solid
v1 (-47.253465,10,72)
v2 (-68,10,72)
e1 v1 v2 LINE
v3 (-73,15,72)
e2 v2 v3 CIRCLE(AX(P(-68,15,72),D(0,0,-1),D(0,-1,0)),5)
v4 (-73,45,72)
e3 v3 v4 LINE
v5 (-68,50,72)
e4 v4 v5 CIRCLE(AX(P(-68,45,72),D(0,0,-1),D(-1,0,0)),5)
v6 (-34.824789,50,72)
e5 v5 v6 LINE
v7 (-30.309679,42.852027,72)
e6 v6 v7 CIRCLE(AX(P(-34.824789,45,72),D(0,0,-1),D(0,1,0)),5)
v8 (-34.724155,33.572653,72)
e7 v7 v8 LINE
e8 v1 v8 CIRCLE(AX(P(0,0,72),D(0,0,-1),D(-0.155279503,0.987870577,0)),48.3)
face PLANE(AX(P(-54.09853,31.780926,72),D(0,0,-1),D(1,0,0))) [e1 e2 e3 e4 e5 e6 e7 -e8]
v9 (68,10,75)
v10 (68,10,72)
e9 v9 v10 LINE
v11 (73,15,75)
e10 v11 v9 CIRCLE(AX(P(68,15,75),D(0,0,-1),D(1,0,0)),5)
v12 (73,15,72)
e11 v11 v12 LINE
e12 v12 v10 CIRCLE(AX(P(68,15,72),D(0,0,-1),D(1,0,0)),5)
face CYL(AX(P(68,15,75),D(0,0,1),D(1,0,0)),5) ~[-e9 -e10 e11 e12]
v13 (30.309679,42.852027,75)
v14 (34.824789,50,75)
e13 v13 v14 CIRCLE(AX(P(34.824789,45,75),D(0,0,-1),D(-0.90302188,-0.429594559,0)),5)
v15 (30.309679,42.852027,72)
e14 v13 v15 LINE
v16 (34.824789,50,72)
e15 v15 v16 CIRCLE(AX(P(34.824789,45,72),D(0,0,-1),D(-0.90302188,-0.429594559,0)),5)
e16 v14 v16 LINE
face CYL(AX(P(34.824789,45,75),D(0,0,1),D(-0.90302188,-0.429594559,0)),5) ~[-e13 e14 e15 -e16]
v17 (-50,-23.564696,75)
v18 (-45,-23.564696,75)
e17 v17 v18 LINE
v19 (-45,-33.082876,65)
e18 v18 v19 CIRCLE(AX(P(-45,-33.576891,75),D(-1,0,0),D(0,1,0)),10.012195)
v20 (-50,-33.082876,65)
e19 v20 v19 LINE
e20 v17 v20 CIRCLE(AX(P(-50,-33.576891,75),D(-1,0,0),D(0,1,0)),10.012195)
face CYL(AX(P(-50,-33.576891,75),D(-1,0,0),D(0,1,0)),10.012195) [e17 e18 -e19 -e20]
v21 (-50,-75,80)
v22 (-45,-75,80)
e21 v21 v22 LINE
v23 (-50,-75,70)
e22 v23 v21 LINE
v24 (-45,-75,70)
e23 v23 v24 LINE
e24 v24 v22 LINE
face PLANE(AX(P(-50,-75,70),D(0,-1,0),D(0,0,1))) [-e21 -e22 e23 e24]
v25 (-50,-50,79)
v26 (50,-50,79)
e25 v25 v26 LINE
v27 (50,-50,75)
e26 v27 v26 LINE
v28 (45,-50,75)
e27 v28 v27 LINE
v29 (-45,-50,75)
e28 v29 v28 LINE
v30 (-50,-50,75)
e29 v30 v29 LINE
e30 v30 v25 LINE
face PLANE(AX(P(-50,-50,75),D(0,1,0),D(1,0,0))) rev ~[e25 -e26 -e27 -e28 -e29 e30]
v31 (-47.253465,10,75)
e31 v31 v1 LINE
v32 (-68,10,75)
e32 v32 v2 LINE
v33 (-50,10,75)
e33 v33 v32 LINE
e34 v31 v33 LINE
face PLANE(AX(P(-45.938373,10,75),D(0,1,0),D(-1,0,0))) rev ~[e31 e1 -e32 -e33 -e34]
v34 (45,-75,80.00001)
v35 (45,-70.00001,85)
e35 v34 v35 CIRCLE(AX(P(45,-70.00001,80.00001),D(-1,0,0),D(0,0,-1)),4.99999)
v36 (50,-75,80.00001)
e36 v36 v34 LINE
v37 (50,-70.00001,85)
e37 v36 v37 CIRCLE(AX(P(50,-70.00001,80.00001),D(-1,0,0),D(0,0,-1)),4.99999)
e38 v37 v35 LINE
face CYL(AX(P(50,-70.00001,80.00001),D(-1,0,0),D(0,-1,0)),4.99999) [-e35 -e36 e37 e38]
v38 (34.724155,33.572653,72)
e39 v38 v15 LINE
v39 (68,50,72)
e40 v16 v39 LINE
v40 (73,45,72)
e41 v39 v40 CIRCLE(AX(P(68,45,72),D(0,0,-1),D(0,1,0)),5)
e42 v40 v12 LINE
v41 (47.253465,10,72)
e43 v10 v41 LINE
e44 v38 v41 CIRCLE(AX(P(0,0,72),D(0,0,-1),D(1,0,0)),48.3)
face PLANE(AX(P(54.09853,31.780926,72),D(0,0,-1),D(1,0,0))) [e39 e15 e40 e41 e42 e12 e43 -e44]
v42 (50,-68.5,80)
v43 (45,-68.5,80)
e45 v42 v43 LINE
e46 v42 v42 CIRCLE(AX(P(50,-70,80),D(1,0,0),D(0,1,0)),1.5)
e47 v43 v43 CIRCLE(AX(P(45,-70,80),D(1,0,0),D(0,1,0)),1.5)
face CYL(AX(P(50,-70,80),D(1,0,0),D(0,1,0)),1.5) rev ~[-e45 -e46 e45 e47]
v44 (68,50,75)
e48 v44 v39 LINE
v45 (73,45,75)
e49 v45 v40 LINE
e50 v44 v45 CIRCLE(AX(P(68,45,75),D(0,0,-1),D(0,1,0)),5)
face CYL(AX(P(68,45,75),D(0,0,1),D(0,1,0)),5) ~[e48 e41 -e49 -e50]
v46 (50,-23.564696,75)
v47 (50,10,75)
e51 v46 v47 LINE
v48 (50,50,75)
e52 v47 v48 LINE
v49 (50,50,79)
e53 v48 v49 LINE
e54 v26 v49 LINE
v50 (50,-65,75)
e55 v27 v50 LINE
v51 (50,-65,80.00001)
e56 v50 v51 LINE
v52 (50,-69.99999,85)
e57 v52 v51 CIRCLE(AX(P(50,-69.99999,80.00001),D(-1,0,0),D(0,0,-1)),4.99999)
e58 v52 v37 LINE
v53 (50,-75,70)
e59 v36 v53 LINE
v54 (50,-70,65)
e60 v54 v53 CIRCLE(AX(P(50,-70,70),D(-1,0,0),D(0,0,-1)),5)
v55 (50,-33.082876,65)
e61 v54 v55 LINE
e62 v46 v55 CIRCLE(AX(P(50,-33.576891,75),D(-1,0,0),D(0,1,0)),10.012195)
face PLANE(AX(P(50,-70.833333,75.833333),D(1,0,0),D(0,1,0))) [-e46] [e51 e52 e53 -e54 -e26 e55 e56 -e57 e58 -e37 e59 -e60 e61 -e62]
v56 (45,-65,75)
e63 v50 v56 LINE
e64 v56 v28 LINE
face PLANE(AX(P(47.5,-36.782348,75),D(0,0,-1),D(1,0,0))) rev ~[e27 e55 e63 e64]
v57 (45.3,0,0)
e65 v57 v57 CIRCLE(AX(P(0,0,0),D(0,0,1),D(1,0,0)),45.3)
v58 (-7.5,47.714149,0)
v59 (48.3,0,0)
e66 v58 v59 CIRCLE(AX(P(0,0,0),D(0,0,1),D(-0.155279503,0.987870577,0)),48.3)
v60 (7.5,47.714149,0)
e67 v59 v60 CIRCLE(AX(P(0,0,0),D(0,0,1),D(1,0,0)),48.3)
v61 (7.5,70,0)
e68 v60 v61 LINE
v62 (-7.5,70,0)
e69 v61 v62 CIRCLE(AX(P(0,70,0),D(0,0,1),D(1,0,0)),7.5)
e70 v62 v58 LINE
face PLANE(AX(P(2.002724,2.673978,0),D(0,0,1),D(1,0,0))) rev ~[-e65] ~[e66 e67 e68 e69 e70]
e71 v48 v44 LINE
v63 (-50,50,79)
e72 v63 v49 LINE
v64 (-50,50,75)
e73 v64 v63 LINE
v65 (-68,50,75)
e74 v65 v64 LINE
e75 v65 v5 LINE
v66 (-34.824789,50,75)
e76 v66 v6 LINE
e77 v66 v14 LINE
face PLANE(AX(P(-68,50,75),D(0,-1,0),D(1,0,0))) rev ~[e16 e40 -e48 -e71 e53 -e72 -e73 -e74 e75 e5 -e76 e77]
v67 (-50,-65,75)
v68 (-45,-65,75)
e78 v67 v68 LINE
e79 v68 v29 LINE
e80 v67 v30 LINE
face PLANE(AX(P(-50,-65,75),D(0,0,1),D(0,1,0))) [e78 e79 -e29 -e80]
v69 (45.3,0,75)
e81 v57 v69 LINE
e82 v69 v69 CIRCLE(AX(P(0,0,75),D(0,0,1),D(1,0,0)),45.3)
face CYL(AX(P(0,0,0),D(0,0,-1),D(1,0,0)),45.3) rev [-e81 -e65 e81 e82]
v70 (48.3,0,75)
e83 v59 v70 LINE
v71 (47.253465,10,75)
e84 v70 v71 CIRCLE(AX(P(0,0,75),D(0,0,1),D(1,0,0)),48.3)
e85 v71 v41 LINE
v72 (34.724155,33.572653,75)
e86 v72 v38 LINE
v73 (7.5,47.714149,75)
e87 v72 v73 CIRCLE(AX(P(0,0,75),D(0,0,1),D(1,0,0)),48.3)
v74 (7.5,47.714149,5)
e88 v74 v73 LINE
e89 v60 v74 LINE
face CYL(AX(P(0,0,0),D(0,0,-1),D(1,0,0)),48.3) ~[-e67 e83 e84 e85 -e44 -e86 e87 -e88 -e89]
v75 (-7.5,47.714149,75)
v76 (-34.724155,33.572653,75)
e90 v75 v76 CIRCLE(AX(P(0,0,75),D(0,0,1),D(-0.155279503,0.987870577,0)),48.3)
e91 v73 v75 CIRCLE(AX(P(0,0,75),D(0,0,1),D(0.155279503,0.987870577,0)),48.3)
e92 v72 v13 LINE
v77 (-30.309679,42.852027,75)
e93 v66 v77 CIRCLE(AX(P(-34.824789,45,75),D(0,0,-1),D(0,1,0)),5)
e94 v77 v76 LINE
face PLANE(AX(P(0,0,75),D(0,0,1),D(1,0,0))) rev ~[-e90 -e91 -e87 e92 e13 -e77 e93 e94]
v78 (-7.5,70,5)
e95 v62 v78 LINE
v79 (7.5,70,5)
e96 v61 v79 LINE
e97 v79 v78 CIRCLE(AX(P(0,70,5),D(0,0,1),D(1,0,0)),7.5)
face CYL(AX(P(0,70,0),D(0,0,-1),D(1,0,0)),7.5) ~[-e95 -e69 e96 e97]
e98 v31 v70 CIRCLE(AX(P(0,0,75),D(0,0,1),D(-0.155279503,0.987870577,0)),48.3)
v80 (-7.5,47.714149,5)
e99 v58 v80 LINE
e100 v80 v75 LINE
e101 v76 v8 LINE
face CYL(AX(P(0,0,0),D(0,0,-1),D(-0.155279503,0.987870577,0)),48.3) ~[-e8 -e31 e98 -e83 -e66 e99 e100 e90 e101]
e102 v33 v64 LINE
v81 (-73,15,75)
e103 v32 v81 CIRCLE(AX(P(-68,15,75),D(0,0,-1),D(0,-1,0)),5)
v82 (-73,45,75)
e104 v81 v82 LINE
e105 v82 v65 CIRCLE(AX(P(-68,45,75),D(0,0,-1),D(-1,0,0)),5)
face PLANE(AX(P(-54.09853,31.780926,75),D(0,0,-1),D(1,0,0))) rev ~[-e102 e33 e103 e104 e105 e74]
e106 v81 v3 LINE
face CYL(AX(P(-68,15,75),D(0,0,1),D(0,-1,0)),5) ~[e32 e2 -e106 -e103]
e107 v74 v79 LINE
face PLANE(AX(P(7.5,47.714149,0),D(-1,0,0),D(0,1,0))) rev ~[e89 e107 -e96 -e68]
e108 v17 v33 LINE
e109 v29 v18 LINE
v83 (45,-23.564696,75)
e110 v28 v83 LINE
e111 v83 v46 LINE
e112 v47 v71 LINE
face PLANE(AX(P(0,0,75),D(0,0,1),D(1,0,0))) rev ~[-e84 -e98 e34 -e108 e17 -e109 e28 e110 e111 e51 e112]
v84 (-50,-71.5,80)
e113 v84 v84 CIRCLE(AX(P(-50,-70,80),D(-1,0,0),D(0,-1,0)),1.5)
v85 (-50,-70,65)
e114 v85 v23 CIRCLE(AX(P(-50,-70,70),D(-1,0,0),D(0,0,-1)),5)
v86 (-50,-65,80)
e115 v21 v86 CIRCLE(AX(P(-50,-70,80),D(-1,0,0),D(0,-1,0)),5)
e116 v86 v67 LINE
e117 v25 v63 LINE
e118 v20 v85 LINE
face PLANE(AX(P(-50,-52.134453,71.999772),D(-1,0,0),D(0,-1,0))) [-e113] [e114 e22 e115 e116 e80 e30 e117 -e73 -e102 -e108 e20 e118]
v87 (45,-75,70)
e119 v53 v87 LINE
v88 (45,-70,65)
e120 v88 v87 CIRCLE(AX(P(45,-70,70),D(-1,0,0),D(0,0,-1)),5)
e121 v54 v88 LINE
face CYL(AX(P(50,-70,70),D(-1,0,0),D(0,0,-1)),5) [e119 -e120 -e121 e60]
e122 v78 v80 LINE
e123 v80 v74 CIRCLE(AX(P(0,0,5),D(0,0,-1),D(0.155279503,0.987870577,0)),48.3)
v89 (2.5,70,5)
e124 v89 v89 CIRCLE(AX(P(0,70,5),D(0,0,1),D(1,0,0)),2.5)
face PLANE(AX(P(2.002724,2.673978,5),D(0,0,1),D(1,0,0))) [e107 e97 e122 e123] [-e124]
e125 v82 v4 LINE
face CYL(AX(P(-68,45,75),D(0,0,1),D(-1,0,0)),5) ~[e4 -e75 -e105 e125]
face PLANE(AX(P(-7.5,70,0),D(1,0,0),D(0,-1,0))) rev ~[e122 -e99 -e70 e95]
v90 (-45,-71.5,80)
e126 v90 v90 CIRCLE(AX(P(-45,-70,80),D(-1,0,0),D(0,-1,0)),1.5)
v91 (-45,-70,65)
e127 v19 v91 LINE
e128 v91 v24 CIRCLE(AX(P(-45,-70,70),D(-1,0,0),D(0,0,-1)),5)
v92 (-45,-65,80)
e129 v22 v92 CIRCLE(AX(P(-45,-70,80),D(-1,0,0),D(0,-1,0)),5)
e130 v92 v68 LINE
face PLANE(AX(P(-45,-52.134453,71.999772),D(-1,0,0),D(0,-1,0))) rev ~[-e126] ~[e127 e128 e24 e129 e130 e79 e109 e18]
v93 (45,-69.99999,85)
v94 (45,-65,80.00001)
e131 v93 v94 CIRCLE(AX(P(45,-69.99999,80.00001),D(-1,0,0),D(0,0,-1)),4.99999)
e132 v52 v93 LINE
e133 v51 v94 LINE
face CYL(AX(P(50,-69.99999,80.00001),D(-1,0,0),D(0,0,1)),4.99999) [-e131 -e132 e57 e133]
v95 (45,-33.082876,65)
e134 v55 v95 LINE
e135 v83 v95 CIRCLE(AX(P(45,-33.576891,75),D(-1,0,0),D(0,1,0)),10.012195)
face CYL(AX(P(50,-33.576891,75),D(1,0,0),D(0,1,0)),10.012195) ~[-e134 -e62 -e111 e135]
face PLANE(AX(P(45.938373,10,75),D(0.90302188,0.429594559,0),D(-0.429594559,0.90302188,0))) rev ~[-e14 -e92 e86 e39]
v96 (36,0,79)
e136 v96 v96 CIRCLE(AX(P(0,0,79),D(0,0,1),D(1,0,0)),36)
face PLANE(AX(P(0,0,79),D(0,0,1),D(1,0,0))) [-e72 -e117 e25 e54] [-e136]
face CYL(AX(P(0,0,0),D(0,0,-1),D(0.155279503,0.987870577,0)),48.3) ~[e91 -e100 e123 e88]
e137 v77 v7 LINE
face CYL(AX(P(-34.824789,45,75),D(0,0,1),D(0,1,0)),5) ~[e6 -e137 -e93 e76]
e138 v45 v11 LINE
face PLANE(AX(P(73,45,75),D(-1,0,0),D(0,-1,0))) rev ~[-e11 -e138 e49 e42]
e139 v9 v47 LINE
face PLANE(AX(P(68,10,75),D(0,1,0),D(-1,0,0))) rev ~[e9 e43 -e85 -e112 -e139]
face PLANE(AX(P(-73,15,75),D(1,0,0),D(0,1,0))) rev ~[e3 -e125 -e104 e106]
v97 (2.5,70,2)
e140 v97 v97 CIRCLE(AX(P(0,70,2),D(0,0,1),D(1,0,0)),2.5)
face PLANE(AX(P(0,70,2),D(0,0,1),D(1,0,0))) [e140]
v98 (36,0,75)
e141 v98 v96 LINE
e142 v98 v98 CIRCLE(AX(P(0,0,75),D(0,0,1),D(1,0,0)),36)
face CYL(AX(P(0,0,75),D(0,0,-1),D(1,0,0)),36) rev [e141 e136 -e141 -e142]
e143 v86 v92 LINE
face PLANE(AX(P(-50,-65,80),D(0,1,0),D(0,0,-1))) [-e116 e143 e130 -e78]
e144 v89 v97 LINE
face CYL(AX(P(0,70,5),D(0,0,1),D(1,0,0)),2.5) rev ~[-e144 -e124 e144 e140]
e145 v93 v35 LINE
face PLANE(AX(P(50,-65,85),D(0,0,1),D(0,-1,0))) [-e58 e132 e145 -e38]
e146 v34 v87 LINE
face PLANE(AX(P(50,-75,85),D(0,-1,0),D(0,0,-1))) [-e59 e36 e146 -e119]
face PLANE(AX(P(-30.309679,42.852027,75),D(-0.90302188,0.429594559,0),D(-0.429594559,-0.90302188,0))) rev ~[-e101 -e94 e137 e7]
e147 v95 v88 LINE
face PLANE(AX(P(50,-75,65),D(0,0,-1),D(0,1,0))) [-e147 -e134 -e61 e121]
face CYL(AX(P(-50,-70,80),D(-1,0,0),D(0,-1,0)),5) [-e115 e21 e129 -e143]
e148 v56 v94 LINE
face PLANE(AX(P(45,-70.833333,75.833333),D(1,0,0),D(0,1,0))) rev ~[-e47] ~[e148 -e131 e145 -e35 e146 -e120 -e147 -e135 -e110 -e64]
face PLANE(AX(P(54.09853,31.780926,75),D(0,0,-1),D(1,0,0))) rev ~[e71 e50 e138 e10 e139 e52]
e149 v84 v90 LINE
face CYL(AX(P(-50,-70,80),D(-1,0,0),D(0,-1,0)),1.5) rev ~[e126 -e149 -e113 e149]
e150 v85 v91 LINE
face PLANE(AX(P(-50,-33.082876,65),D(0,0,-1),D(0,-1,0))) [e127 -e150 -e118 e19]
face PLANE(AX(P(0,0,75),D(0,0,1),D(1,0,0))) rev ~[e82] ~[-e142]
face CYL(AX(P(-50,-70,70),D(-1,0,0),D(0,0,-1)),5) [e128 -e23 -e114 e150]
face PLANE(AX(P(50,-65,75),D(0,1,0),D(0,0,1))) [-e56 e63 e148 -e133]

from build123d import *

# Parameters (mm, degrees)
F0_R      = 45.3
F1_DEPTH  = 75
F2_DEPTH  = 5
F3_R      = 2.5
F4_DEPTH  = 3
F5_W      = 100
F5_H      = 100
F5_R      = 48.3
F5_R_2    = 45.3
F5_R_3    = 36
F6_DEPTH  = 4
F8_DEPTH  = 3
F9_W      = 5
F9_H      = 26.435303688
F9_H_2    = 20
F10_DEPTH = 10
F12_DEPTH = 5
F14_DEPTH = 5
F15_R     = 5
F16_R     = 4.99999
F17_R     = 1.5
F18_DEPTH = 5
F20_R     = 1.5
F21_DEPTH = 5


# Not quite as in the source:
# - a fillet or chamfer is up to 0.001 mm smaller than in the source, because OpenCascade refuses the exact size


with BuildPart() as f1:
    # F0 (on Top) → F1 (new body)
    with BuildSketch(Plane.XY):
        with BuildLine():
            ThreePointArc((-7.5, 47.714148845), (-31.3898072629, -36.7092631362), (48.3, 0))
            ThreePointArc((48.3, 0), (36.7092631362, 31.3898072629), (7.5, 47.714148845))
            Line((7.5, 47.714148845), (7.5, 46.6673743725))
            Line((7.5, 46.6673743725), (-7.5, 46.6673743725))
            Line((-7.5, 46.6673743725), (-7.5, 47.714148845))
        make_face()
        Circle(F0_R, mode=Mode.SUBTRACT)
        with BuildLine():
            Line((7.5, 46.6673743725), (7.5, 47.714148845))
            ThreePointArc((7.5, 47.714148845), (0, 48.3), (-7.5, 47.714148845))
            Line((-7.5, 47.714148845), (-7.5, 46.6673743725))
            Line((-7.5, 46.6673743725), (7.5, 46.6673743725))
        make_face()
    extrude(amount=F1_DEPTH)

    # F0 (on Top) → F2 (join)
    with BuildSketch(Plane.XY):
        with BuildLine():
            ThreePointArc((-7.5, 47.714148845), (-31.3898072629, -36.7092631362), (48.3, 0))
            ThreePointArc((48.3, 0), (36.7092631362, 31.3898072629), (7.5, 47.714148845))
            Line((7.5, 47.714148845), (7.5, 46.6673743725))
            Line((7.5, 46.6673743725), (-7.5, 46.6673743725))
            Line((-7.5, 46.6673743725), (-7.5, 47.714148845))
        make_face()
        Circle(F0_R, mode=Mode.SUBTRACT)
        with BuildLine():
            Line((7.5, 46.6673743725), (7.5, 47.714148845))
            ThreePointArc((7.5, 47.714148845), (0, 48.3), (-7.5, 47.714148845))
            Line((-7.5, 47.714148845), (-7.5, 46.6673743725))
            Line((-7.5, 46.6673743725), (7.5, 46.6673743725))
        make_face()
        with BuildLine():
            ThreePointArc((-7.5, 47.714148845), (0, 48.3), (7.5, 47.714148845))
            Line((7.5, 47.714148845), (7.5, 70))
            ThreePointArc((7.5, 70), (0, 77.5), (-7.5, 70))
            Line((-7.5, 70), (-7.5, 47.714148845))
        make_face()
    extrude(amount=F2_DEPTH)

    # F3 (on face) → F4 (cut)
    with BuildSketch(Plane.XY.offset(5)):
        with Locations((0, 70)):
            Circle(F3_R)
    extrude(amount=-F4_DEPTH, mode=Mode.SUBTRACT)

    # F5 (on face) → F6 (join)
    with BuildSketch(Plane.XY.offset(75)):
        Rectangle(F5_W, F5_H)
        Circle(F5_R, mode=Mode.SUBTRACT)
        Circle(F5_R)
        Circle(F5_R_2, mode=Mode.SUBTRACT)
        Circle(F5_R_2)
        Circle(F5_R_3, mode=Mode.SUBTRACT)
    extrude(amount=F6_DEPTH)

    # F7 (on face) → F8 (join)
    with BuildSketch(Plane(origin=(0, 0, 75), x_dir=(1, 0, 0), z_dir=(0, 0, -1))):
        with BuildLine():
            Line((-68, -50), (-45.938372612, -50))
            Line((-45.938372612, -50), (-34.8247885738, -50))
            ThreePointArc((-34.8247885738, -50), (-30.5975043414, -47.6702187211), (-30.3096791752, -42.8520272073))
            Line((-30.3096791752, -42.8520272073), (-45.938372612, -10))
            Line((-45.938372612, -10), (-68, -10))
            ThreePointArc((-68, -10), (-71.5355339059, -11.4644660941), (-73, -15))
            Line((-73, -15), (-73, -45))
            ThreePointArc((-73, -45), (-71.5355339059, -48.5355339059), (-68, -50))
        make_face()
        with BuildLine():
            Line((68, -10), (45.938372612, -10))
            Line((45.938372612, -10), (30.3096791752, -42.8520272073))
            ThreePointArc((30.3096791752, -42.8520272073), (30.5975043414, -47.6702187211), (34.8247885738, -50))
            Line((34.8247885738, -50), (45.938372612, -50))
            Line((45.938372612, -50), (68, -50))
            ThreePointArc((68, -50), (71.5355339059, -48.5355339059), (73, -45))
            Line((73, -45), (73, -15))
            ThreePointArc((73, -15), (71.5355339059, -11.4644660941), (68, -10))
        make_face()
    extrude(amount=F8_DEPTH)

    # F9 (on face) → F10 (join)
    with BuildSketch(Plane(origin=(0, 0, 75), x_dir=(1, 0, 0), z_dir=(0, 0, -1))):
        with Locations((47.5, 36.782348156)):
            Rectangle(F9_W, F9_H)
        with Locations((47.5, 60)):
            Rectangle(F9_W, F9_H_2)
    extrude(amount=F10_DEPTH)

    # F11 (on face) → F12 (cut, through all)
    with BuildSketch(Plane.YZ.offset(50)):
        with BuildLine():
            ThreePointArc((-23.564696312, 75), (-26.3246425928, 68.0971789948), (-33.0828763545, 65))
            Line((-33.0828763545, 65), (-23.564696312, 65))
            Line((-23.564696312, 65), (-23.564696312, 75))
        make_face()
    extrude(amount=-F12_DEPTH, mode=Mode.SUBTRACT)

    # F13 (on face) → F14 (join)
    with BuildSketch(Plane.YZ.offset(50)):
        Polygon((-70, 65), (-70, 75), (-65, 75), (-65, 85), (-75, 85), (-75, 65), align=None)
    extrude(amount=-F14_DEPTH)

    # F15
    f15_edges = [f1.edges().sort_by_distance(p)[0] for p in [
        (47.5, -75, 65),
    ]]
    fillet(f15_edges, radius=F15_R)

    # F16 (radius 5 in the source; OpenCascade refuses exactly that, so slightly less here)
    f16_edges = [f1.edges().sort_by_distance(p)[0] for p in [
        (47.5, -75, 85),
        (47.5, -65, 85),
    ]]
    fillet(f16_edges, radius=F16_R)

    # F17 (on face) → F18 (cut, through all)
    with BuildSketch(Plane.YZ.offset(50)):
        with Locations((-70, 80)):
            Circle(F17_R)
    extrude(amount=-F18_DEPTH, mode=Mode.SUBTRACT)

    # F20 (on offset) → F21 (join)
    with BuildSketch(Plane(origin=(-50, 0, 0), x_dir=(0, -1, 0), z_dir=(-1, 0, 0))):
        with BuildLine():
            Line((75, 70), (75, 80))
            ThreePointArc((75, 80), (70, 85), (65, 80))
            Line((65, 80), (65, 75))
            Line((65, 75), (50, 75))
            Line((50, 75), (23.564696312, 75))
            ThreePointArc((23.564696312, 75), (26.3246425928, 68.0971789948), (33.0828763545, 65))
            Line((33.0828763545, 65), (70, 65))
            ThreePointArc((70, 65), (73.5355339059, 66.4644660941), (75, 70))
        make_face()
        with Locations((70, 80)):
            Circle(F20_R, mode=Mode.SUBTRACT)
    extrude(amount=-F21_DEPTH)


solid = f1.part
